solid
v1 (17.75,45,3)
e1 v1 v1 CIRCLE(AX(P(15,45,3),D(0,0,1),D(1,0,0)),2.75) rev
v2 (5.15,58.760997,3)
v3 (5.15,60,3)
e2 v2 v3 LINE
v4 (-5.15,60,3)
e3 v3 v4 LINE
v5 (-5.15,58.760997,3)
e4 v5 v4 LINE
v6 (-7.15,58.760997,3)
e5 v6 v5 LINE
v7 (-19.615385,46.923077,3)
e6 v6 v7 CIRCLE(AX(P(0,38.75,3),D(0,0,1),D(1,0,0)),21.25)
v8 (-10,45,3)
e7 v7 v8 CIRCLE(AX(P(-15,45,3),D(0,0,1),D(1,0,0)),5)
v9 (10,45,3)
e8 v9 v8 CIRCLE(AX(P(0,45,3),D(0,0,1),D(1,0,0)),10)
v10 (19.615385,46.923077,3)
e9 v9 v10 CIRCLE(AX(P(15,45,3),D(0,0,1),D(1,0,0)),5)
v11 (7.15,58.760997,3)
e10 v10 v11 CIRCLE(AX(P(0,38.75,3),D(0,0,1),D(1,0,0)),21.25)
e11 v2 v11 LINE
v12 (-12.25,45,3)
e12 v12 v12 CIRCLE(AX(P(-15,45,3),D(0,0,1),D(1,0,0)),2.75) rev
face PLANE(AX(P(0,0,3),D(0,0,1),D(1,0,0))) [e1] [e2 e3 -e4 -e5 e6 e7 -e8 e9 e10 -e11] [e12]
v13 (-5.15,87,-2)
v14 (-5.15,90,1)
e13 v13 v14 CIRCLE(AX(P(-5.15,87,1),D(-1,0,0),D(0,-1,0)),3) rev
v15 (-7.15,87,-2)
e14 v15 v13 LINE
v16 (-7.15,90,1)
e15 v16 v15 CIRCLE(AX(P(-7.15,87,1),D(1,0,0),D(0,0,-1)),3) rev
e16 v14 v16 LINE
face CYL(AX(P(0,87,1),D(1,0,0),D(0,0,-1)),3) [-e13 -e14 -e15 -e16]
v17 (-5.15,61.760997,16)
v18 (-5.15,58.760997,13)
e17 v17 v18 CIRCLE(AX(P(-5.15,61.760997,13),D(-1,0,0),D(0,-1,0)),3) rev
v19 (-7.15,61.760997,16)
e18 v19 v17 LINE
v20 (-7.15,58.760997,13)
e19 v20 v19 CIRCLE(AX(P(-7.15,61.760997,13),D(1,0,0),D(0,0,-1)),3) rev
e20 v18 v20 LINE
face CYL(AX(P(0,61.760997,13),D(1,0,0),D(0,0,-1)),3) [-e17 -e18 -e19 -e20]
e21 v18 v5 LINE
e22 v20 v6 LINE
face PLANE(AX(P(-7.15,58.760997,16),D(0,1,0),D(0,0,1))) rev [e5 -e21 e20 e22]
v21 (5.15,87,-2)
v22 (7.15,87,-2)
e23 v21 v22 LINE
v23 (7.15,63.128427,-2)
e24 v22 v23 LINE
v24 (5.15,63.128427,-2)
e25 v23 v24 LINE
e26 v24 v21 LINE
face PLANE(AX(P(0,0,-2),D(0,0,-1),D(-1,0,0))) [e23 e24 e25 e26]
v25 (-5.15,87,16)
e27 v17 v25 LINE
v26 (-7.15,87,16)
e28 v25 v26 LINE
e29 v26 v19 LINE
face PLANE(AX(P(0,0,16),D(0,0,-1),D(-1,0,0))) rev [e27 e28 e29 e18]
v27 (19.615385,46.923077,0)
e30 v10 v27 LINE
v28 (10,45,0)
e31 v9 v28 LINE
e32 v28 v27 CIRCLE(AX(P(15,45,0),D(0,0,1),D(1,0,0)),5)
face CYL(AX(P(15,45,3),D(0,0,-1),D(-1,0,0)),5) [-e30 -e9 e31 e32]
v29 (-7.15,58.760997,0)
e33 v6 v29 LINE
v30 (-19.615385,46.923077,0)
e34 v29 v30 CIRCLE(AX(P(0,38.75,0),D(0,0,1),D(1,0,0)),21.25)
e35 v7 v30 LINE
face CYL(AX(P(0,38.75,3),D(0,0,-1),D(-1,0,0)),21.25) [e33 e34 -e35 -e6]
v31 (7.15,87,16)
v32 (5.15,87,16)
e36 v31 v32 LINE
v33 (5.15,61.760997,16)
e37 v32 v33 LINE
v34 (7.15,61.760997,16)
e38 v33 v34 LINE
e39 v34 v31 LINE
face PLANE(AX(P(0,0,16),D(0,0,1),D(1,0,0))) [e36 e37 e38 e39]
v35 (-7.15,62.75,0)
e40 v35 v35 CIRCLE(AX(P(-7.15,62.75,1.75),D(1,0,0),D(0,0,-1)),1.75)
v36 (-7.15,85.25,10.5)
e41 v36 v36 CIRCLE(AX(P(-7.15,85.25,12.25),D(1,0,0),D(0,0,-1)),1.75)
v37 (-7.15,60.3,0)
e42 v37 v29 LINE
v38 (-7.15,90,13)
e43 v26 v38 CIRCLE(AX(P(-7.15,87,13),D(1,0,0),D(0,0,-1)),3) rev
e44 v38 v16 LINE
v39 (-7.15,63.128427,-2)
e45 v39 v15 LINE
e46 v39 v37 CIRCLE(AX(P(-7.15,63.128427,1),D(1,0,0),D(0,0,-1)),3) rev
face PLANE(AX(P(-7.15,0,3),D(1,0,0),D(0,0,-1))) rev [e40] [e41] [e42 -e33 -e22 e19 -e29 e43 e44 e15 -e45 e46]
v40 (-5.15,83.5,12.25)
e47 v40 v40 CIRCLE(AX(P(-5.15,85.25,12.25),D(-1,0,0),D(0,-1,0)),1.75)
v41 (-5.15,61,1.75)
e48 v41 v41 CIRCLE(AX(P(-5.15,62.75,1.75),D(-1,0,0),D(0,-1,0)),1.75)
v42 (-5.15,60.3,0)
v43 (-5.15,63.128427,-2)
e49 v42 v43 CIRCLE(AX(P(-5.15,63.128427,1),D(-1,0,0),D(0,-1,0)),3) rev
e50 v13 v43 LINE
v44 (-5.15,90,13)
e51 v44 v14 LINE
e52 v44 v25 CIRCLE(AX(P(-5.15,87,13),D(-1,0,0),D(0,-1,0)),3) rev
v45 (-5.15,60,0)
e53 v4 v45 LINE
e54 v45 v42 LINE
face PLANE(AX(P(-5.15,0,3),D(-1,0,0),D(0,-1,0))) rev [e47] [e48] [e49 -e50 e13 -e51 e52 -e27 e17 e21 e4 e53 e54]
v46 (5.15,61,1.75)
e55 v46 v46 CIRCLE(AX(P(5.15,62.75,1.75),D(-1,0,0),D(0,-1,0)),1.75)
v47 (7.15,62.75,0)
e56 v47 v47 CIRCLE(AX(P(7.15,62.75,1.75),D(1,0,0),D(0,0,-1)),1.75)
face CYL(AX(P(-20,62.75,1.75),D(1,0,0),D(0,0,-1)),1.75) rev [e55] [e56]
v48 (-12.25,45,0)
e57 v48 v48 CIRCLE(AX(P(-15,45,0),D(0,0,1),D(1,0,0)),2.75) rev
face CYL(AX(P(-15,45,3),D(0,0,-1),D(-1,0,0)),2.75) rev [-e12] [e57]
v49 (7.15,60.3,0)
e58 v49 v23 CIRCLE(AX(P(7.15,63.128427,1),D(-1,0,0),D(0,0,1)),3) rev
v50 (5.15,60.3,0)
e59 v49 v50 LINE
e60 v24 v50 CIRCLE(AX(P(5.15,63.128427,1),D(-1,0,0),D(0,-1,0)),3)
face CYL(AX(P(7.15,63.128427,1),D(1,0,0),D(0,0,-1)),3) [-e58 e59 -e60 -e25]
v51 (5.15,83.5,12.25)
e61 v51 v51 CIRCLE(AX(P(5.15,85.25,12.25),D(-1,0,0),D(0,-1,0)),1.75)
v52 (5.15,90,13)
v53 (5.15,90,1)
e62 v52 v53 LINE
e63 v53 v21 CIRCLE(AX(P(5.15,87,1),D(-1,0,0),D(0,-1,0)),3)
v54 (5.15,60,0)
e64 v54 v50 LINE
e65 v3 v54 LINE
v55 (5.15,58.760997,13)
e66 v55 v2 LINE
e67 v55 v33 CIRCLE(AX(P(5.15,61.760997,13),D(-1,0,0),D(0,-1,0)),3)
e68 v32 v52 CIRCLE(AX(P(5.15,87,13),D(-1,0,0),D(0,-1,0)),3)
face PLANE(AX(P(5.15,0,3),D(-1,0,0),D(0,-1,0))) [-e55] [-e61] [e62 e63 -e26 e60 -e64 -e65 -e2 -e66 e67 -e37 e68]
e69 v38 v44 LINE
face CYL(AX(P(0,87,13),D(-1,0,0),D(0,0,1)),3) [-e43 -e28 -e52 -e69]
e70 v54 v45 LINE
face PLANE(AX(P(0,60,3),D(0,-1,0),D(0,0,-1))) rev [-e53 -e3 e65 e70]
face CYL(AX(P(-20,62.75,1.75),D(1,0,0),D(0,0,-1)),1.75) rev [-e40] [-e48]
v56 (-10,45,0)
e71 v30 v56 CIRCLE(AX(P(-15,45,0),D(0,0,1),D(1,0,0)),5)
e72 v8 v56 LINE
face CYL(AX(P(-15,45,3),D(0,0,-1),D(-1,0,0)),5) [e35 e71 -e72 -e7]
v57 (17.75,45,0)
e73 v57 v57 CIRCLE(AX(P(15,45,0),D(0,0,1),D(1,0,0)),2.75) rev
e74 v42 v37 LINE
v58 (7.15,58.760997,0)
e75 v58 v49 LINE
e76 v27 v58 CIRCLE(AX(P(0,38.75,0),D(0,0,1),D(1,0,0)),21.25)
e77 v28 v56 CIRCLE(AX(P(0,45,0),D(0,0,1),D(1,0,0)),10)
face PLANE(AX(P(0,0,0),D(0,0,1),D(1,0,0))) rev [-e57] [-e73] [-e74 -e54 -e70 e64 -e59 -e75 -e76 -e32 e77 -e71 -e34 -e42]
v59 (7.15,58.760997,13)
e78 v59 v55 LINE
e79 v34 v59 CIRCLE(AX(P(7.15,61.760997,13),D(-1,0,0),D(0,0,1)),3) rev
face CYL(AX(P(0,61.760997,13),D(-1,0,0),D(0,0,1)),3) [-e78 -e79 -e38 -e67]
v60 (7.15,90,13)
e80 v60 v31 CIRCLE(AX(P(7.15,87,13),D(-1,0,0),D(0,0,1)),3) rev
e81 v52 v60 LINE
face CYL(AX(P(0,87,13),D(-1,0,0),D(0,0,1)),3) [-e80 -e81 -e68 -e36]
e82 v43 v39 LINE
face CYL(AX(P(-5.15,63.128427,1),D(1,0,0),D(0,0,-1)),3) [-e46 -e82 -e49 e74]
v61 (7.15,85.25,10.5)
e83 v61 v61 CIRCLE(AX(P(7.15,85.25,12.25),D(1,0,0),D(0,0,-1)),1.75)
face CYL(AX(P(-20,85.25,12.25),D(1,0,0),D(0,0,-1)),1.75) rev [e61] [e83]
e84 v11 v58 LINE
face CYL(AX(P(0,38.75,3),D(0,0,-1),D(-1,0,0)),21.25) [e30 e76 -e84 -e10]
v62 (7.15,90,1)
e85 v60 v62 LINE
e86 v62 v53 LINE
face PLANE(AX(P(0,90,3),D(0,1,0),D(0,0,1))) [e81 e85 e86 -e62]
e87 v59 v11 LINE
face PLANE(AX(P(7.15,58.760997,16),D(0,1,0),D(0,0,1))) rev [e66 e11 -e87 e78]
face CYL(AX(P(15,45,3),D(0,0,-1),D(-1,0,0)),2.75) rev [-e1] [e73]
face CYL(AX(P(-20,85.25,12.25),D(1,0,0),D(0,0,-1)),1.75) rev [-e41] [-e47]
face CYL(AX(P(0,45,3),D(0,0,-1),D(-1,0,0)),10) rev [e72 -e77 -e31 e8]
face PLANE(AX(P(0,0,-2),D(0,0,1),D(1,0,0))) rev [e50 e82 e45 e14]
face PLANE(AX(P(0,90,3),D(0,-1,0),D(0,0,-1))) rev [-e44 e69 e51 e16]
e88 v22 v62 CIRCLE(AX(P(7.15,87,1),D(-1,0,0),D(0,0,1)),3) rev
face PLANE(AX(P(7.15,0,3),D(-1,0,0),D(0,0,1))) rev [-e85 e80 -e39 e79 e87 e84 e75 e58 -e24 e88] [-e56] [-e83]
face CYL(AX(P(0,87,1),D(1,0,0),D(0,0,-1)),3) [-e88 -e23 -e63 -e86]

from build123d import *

# Parameters (mm, degrees)
SKETCH2_R           = 5
SKETCH2_R_2         = 2.75
SKETCH2_W           = 2
SKETCH2_H           = 30
BOSS_EXTRUDE1_DEPTH = 3
SKETCH3_W           = 2
SKETCH3_H           = 31.239003023
BOSS_EXTRUDE2_DEPTH = 13
SKETCH4_W           = 2
SKETCH4_H           = 29.7
BOSS_EXTRUDE3_DEPTH = 2
SKETCH5_R           = 1.75
CUT_EXTRUDE1_DEPTH  = 96.357865433
FILLET1_R           = 3


with BuildPart() as part:
    # Sketch2 → Boss-Extrude1 (new body)
    # profile 1 of 13: a face of its own
    with BuildSketch(Plane.XY):
        with BuildLine():
            Line((0, 55), (-5.15, 55))
            Line((-5.15, 55), (-7.15, 55))
            Line((-7.15, 55), (-7.15, 58.760996977))
            ThreePointArc((-7.15, 58.760996977), (-14.633199965, 54.158827301), (-19.615384615, 46.923076923))
            ThreePointArc((-19.615384615, 46.923076923), (-14.019419324, 49.902903378), (-10, 45))
            ThreePointArc((-10, 45), (-7.071067812, 52.071067812), (0, 55))
        make_face()
    # profile 2 of 13: a face of its own
    with BuildSketch(Plane.XY):
        with Locations((-15, 45)):
            Circle(SKETCH2_R)
        with Locations((-15, 45)):
            Circle(SKETCH2_R_2, mode=Mode.SUBTRACT)
    # profile 3 of 13: a face of its own
    with BuildSketch(Plane.XY):
        with BuildLine():
            Line((7.15, 55), (5.15, 55))
            Line((5.15, 55), (0, 55))
            ThreePointArc((0, 55), (7.071067812, 52.071067812), (10, 45))
            ThreePointArc((10, 45), (14.019419324, 49.902903378), (19.615384615, 46.923076923))
            ThreePointArc((19.615384615, 46.923076923), (14.633199965, 54.158827301), (7.15, 58.760996977))
            Line((7.15, 58.760996977), (7.15, 55))
        make_face()
    # profile 4 of 13: a face of its own
    with BuildSketch(Plane.XY):
        with Locations((15, 45)):
            Circle(SKETCH2_R)
        with Locations((15, 45)):
            Circle(SKETCH2_R_2, mode=Mode.SUBTRACT)
    # profile 5 of 13: a face of its own
    with BuildSketch(Plane.XY):
        with BuildLine():
            ThreePointArc((5.15, 59.366498248), (2.594408626, 59.841029939), (0, 60))
            ThreePointArc((0, 60), (-2.594408626, 59.841029939), (-5.15, 59.366498248))
            Line((-5.15, 59.366498248), (-5.15, 55))
            Line((-5.15, 55), (0, 55))
            Line((0, 55), (5.15, 55))
            Line((5.15, 55), (5.15, 59.366498248))
        make_face()
    # profile 6 of 13: a face of its own
    with BuildSketch(Plane.XY):
        with BuildLine():
            ThreePointArc((7.15, 58.760996977), (6.157447356, 59.088346591), (5.15, 59.366498248))
            Line((5.15, 59.366498248), (5.15, 55))
            Line((5.15, 55), (7.15, 55))
            Line((7.15, 55), (7.15, 58.760996977))
        make_face()
    # profile 7 of 13: a face of its own
    with BuildSketch(Plane.XY):
        with BuildLine():
            Line((-5.15, 55), (-5.15, 59.366498248))
            ThreePointArc((-5.15, 59.366498248), (-6.157447356, 59.088346591), (-7.15, 58.760996977))
            Line((-7.15, 58.760996977), (-7.15, 55))
            Line((-7.15, 55), (-5.15, 55))
        make_face()
    # profile 8 of 13: a face of its own
    with BuildSketch(Plane.XY):
        with Locations((-6.15, 75)):
            Rectangle(SKETCH2_W, SKETCH2_H)
    # profile 9 of 13: a face of its own
    with BuildSketch(Plane.XY):
        with BuildLine():
            Line((-5.15, 59.366498248), (-5.15, 60))
            Line((-5.15, 60), (-7.15, 60))
            Line((-7.15, 60), (-7.15, 58.760996977))
            ThreePointArc((-7.15, 58.760996977), (-6.157447356, 59.088346591), (-5.15, 59.366498248))
        make_face()
    # profile 10 of 13: a face of its own
    with BuildSketch(Plane.XY):
        with BuildLine():
            ThreePointArc((-5.15, 59.366498248), (-2.594408626, 59.841029939), (0, 60))
            Line((0, 60), (-5.15, 60))
            Line((-5.15, 60), (-5.15, 59.366498248))
        make_face()
    # profile 11 of 13: a face of its own
    with BuildSketch(Plane.XY):
        with BuildLine():
            Line((5.15, 60), (0, 60))
            ThreePointArc((0, 60), (2.594408626, 59.841029939), (5.15, 59.366498248))
            Line((5.15, 59.366498248), (5.15, 60))
        make_face()
    # profile 12 of 13: a face of its own
    with BuildSketch(Plane.XY):
        with BuildLine():
            Line((7.15, 60), (5.15, 60))
            Line((5.15, 60), (5.15, 59.366498248))
            ThreePointArc((5.15, 59.366498248), (6.157447356, 59.088346591), (7.15, 58.760996977))
            Line((7.15, 58.760996977), (7.15, 60))
        make_face()
    # profile 13 of 13: a face of its own
    with BuildSketch(Plane.XY):
        with Locations((6.15, 75)):
            Rectangle(SKETCH2_W, SKETCH2_H)
    extrude(amount=BOSS_EXTRUDE1_DEPTH)

    # Sketch3 → Boss-Extrude2 (add)
    with BuildSketch(Plane.XY.offset(3)):
        with Locations((-6.15, 74.380498488)):
            Rectangle(SKETCH3_W, SKETCH3_H)
        with Locations((6.15, 74.380498488)):
            Rectangle(SKETCH3_W, SKETCH3_H)
    extrude(amount=BOSS_EXTRUDE2_DEPTH)

    # Sketch4 → Boss-Extrude3 (add)
    with BuildSketch(Plane(origin=(0, 0, 0), x_dir=(-1, 0, 0), z_dir=(0, 0, -1))):
        with Locations((-6.15, 75.15)):
            Rectangle(SKETCH4_W, SKETCH4_H)
        with Locations((6.15, 75.15)):
            Rectangle(SKETCH4_W, SKETCH4_H)
    extrude(amount=BOSS_EXTRUDE3_DEPTH)

    # Sketch5 → Cut-Extrude1 (cut, through all)
    with BuildSketch(Plane(origin=(7.15, 0, 0), x_dir=(0, 0, -1), z_dir=(1, 0, 0))):
        with Locations((-1.75, 62.75)):
            Circle(SKETCH5_R)
        with Locations((-12.25, 85.25)):
            Circle(SKETCH5_R)
    extrude(amount=-CUT_EXTRUDE1_DEPTH, mode=Mode.SUBTRACT)

    # Fillet1
    # the kernel refuses this fillet: 3 mm, written as the material it takes off along each edge
    with BuildSketch(Plane(origin=(1.921067812, 60.3, -2), x_dir=(0, 0, 1), z_dir=(-1, 0, 0))) as fillet1_piece_1:
        with BuildLine():
            CenterArc((3, 2.828427125), FILLET1_R, 180, 70.528779366)
            Line((0, 2.828427125), (-0.06, 2.828427125))
            Line((-0.06, 2.828427125), (-0.06, 0))
            Line((-0.06, 0), (0, -0.06))
            ThreePointArc((0, -0.06), (1, -0.06), (1.98, -0.056568542))
            Line((1.98, -0.056568542), (2, 0))
        make_face()
    extrude(amount=16.142135624, mode=Mode.SUBTRACT)
    with BuildSketch(Plane(origin=(-1.921067812, 60.3, -2), x_dir=(0, 0, 1), z_dir=(1, 0, 0))) as fillet1_piece_2:
        with BuildLine():
            CenterArc((3, -2.828427125), FILLET1_R, 109.471220634, 70.528779366)
            Line((0, -2.828427125), (-0.06, -2.828427125))
            Line((-0.06, -2.828427125), (-0.06, 0))
            Line((-0.06, 0), (0, 0.06))
            ThreePointArc((0, 0.06), (1, 0.06), (1.98, 0.056568542))
            Line((1.98, 0.056568542), (2, 0))
        make_face()
    extrude(amount=16.142135624, mode=Mode.SUBTRACT)
    with BuildSketch(Plane(origin=(14.65, 58.760996977, 16), x_dir=(0, 0, -1), z_dir=(-1, 0, 0)), Plane(origin=(14.65, 90, -2), x_dir=(0, 0, 1), z_dir=(-1, 0, 0)), Plane(origin=(-14.65, 90, -2), x_dir=(0, -1, 0), z_dir=(1, 0, 0)), Plane(origin=(-2.35, 90, 16), x_dir=(0, 0, -1), z_dir=(1, 0, 0)), Plane(origin=(2.35, 90, 16), x_dir=(0, -1, 0), z_dir=(-1, 0, 0))) as fillet1_piece_3:
        with BuildLine():
            CenterArc((FILLET1_R, -FILLET1_R), FILLET1_R, 90, 90)
            Line((0, -FILLET1_R), (-FILLET1_R * 0.02, -FILLET1_R))
            Line((-FILLET1_R * 0.02, -FILLET1_R), (-FILLET1_R * 0.02, FILLET1_R * 0.02))
            Line((-FILLET1_R * 0.02, FILLET1_R * 0.02), (FILLET1_R, FILLET1_R * 0.02))
            Line((FILLET1_R, FILLET1_R * 0.02), (FILLET1_R, 0))
        make_face()
    extrude(amount=17, mode=Mode.SUBTRACT)
    with BuildSketch(Plane(origin=(-14.65, 58.760996977, 16), x_dir=(0, 0, -1), z_dir=(1, 0, 0))) as fillet1_piece_4:
        with BuildLine():
            CenterArc((FILLET1_R, FILLET1_R), FILLET1_R, 180, 90)
            Line((0, FILLET1_R), (-FILLET1_R * 0.02, FILLET1_R))
            Line((-FILLET1_R * 0.02, FILLET1_R), (-FILLET1_R * 0.02, -FILLET1_R * 0.02))
            Line((-FILLET1_R * 0.02, -FILLET1_R * 0.02), (FILLET1_R, -FILLET1_R * 0.02))
            Line((FILLET1_R, -FILLET1_R * 0.02), (FILLET1_R, 0))
        make_face()
    extrude(amount=17, mode=Mode.SUBTRACT)


solid = part.part
